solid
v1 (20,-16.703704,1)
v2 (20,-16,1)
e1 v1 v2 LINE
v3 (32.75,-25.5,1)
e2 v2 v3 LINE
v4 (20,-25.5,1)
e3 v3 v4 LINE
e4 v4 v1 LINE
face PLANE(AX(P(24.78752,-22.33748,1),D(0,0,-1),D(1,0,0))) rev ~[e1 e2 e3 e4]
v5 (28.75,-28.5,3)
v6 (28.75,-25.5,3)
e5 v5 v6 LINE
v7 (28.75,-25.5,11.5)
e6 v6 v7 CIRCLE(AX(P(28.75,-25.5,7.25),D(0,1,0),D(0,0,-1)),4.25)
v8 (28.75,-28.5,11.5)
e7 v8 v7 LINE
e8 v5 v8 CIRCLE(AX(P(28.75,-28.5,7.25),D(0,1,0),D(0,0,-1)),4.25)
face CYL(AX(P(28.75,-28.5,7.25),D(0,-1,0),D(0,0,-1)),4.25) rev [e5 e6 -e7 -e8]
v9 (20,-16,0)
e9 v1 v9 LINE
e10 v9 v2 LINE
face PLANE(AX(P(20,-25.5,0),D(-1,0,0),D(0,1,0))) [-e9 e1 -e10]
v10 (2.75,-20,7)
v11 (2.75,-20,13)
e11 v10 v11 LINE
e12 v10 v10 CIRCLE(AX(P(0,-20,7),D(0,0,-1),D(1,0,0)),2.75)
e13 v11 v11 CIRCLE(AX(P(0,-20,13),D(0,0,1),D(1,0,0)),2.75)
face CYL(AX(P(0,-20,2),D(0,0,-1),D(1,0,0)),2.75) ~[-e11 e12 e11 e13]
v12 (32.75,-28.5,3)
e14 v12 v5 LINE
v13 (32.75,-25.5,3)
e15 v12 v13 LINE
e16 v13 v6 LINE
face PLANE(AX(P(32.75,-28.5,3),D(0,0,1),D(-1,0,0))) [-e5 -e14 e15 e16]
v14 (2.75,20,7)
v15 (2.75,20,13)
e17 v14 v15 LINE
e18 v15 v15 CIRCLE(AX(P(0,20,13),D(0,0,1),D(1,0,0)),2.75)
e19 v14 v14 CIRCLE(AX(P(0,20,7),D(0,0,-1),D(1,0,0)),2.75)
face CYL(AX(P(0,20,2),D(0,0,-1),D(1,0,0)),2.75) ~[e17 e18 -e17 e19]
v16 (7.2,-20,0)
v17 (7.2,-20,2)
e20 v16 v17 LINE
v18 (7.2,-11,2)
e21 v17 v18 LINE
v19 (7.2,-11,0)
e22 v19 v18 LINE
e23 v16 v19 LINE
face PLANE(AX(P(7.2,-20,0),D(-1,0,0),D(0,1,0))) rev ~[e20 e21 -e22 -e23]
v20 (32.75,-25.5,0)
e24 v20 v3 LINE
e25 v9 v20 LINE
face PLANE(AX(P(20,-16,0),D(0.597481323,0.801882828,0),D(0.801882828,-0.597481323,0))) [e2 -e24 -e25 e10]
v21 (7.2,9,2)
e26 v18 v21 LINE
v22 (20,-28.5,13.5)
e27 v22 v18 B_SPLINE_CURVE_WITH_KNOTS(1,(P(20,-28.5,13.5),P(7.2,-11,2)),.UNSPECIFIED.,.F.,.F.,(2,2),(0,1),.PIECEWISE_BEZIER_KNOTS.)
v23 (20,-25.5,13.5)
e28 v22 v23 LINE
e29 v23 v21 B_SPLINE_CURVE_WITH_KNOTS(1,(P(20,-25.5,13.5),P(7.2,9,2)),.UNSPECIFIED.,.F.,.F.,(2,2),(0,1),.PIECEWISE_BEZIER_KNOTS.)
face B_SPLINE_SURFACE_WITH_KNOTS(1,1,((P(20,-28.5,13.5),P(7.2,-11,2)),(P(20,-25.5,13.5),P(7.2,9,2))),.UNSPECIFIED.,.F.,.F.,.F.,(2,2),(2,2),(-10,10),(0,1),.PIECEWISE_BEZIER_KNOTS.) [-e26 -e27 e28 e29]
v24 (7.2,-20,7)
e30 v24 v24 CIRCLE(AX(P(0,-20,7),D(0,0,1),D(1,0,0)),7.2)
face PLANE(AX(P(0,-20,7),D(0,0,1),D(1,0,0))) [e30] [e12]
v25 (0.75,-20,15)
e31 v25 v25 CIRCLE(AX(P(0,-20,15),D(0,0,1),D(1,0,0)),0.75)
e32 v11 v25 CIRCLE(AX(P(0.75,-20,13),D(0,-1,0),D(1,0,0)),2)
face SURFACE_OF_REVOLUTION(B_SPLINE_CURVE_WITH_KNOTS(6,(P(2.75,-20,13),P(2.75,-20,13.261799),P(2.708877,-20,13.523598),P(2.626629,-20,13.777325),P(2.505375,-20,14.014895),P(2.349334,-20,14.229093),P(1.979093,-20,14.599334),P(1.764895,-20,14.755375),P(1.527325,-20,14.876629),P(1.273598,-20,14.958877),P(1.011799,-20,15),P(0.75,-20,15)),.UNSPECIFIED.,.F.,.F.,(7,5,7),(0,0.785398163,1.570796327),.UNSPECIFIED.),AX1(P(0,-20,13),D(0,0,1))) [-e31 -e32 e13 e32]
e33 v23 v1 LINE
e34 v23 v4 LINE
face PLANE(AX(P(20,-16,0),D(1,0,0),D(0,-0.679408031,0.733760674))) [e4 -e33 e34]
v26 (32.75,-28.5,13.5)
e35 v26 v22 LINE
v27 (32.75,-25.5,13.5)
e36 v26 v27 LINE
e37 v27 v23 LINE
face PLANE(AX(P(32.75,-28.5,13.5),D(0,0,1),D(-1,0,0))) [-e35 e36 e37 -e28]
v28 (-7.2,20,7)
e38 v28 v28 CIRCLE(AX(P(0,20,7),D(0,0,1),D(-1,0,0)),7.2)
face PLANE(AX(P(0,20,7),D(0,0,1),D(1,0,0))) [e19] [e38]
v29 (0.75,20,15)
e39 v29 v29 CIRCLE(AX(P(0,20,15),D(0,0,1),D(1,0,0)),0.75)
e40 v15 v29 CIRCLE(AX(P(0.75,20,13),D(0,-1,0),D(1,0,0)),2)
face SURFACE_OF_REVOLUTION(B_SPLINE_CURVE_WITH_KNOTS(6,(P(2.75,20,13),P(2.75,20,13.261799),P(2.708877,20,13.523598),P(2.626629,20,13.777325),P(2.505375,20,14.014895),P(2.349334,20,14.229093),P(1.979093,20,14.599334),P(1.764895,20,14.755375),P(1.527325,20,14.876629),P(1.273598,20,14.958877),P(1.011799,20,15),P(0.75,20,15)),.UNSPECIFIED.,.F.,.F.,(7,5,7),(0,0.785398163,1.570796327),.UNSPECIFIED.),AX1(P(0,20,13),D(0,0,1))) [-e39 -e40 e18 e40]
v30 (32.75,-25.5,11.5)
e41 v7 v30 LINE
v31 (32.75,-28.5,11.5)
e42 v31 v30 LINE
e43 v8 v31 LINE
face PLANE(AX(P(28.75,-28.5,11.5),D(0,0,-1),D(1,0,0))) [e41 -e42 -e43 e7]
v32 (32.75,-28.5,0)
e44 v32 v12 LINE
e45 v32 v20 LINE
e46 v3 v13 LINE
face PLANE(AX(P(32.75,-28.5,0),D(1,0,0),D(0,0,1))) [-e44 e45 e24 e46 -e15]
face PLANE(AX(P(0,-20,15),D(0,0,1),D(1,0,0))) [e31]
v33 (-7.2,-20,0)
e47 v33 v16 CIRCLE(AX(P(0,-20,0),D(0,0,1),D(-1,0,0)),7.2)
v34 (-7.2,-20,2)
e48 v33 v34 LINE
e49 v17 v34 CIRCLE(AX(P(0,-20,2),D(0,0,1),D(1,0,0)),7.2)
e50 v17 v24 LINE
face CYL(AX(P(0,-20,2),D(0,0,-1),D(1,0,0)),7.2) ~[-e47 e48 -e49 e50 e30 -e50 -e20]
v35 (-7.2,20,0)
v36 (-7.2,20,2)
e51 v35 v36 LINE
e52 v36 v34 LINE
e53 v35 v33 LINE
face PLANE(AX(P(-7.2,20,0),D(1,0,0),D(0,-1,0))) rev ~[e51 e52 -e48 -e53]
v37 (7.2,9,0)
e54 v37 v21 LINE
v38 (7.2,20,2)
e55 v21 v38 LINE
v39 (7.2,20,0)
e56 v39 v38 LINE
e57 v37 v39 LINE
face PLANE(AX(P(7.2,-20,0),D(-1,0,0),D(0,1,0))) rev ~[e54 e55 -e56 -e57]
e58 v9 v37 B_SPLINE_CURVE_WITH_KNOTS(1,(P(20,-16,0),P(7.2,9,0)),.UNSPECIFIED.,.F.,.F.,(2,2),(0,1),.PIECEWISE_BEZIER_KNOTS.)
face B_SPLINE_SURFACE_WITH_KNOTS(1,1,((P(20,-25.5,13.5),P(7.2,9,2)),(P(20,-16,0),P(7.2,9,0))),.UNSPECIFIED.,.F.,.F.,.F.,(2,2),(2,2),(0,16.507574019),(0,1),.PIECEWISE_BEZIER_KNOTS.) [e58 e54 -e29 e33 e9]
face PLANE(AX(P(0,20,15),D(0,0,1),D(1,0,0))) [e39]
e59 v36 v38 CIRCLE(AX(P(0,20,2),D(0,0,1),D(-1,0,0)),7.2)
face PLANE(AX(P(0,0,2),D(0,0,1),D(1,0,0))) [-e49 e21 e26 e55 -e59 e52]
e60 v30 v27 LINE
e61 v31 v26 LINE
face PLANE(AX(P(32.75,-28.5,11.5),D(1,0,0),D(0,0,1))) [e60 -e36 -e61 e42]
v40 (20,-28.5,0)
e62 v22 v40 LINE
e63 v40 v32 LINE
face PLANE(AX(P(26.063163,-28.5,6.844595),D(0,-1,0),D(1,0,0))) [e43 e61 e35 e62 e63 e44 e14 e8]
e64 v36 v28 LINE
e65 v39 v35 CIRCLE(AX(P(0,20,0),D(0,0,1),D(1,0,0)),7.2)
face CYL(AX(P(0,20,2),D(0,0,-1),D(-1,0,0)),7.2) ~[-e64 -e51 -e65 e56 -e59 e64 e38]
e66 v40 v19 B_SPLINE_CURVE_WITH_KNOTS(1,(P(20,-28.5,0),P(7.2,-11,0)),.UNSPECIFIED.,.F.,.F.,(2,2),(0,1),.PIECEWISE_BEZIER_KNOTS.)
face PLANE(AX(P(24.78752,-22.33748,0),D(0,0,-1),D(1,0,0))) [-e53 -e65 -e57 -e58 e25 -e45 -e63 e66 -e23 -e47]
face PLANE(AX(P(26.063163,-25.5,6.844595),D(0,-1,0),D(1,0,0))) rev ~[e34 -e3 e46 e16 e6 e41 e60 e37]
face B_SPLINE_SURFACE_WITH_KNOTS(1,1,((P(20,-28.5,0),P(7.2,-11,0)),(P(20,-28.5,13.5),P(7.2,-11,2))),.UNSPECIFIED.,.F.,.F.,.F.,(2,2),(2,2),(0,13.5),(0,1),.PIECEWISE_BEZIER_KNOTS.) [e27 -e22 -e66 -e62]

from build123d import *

# Parameters (mm, degrees)
F1_DEPTH  = 2
F2_R      = 2.75
F3_DEPTH  = 13
F6_DEPTH  = 3
F8_W      = 20
F8_H      = 2
F11_DEPTH = 1
F13_DEPTH = 5
F14_R     = 2


with BuildPart() as f1:
    # F0 (on Top) → F1 (new body)
    with BuildSketch(Plane.XY):
        with BuildLine():
            ThreePointArc((7.2, 20), (0, 27.2), (-7.2, 20))
            Line((-7.2, 20), (-7.2, -20))
            ThreePointArc((-7.2, -20), (0, -27.2), (7.2, -20))
            Line((7.2, -20), (7.2, 20))
        make_face()
    extrude(amount=F1_DEPTH)

    # F2 (on face) → F3 (join)
    with BuildSketch(Plane.XY.offset(2)):
        with Locations((0, 20)):
            Circle(F2_R)
        with Locations((0, -20)):
            Circle(F2_R)
    extrude(amount=F3_DEPTH)



with BuildPart() as f6:
    # F5 (on offset) → F6 (new body)
    with BuildSketch(Plane.XZ.offset(28.5)):
        with BuildLine():
            Line((20, 0), (32.75, 0))
            Line((32.75, 0), (32.75, 3))
            Line((32.75, 3), (28.75, 3))
            ThreePointArc((28.75, 3), (24.5, 7.25), (28.75, 11.5))
            Line((28.75, 11.5), (32.75, 11.5))
            Line((32.75, 11.5), (32.75, 13.5))
            Line((32.75, 13.5), (20, 13.5))
            Line((20, 13.5), (20, 0))
        make_face()
    extrude(amount=-F6_DEPTH)


with BuildPart() as f1_1:
    add(f1.part)

    add(f6.part)  # F9 merges F6
    # F7 (on face) → F9 section 0
    with BuildSketch(Plane(origin=(20, 0, 0), x_dir=(0, -1, 0), z_dir=(-1, 0, 0))):
        Polygon((16, 0), (28.5, 0), (28.5, 13.5), (25.5, 13.5), align=None)
    # F8 (on face) → F9 section 1
    with BuildSketch(Plane.YZ.offset(7.2)):
        with Locations((-1, 1)):
            Rectangle(F8_W, F8_H)
    loft()

    # F10 (on face) → F11 (join)
    with BuildSketch(Plane(origin=(0, 0, 0), x_dir=(1, 0, 0), z_dir=(0, 0, -1))):
        Polygon((20, 16), (32.75, 25.5), (20, 25.5), align=None)
    extrude(amount=-F11_DEPTH)

    # F12 (on face) → F13 (join)
    with BuildSketch(Plane.XY.offset(2)):
        with BuildLine():
            ThreePointArc((7.2, 20), (0, 27.2), (-7.2, 20))
            ThreePointArc((-7.2, 20), (0, 12.8), (7.2, 20))
        make_face()
        with BuildLine():
            ThreePointArc((-7.2, -20), (0, -27.2), (7.2, -20))
            ThreePointArc((7.2, -20), (0, -12.8), (-7.2, -20))
        make_face()
    extrude(amount=F13_DEPTH)

    # F14
    f14_edges = [f1_1.edges().sort_by_distance(p)[0] for p in [
        (-2.75, 20, 15),
        (-2.75, -20, 15),
    ]]
    fillet(f14_edges, radius=F14_R)


solid = f1_1.part
